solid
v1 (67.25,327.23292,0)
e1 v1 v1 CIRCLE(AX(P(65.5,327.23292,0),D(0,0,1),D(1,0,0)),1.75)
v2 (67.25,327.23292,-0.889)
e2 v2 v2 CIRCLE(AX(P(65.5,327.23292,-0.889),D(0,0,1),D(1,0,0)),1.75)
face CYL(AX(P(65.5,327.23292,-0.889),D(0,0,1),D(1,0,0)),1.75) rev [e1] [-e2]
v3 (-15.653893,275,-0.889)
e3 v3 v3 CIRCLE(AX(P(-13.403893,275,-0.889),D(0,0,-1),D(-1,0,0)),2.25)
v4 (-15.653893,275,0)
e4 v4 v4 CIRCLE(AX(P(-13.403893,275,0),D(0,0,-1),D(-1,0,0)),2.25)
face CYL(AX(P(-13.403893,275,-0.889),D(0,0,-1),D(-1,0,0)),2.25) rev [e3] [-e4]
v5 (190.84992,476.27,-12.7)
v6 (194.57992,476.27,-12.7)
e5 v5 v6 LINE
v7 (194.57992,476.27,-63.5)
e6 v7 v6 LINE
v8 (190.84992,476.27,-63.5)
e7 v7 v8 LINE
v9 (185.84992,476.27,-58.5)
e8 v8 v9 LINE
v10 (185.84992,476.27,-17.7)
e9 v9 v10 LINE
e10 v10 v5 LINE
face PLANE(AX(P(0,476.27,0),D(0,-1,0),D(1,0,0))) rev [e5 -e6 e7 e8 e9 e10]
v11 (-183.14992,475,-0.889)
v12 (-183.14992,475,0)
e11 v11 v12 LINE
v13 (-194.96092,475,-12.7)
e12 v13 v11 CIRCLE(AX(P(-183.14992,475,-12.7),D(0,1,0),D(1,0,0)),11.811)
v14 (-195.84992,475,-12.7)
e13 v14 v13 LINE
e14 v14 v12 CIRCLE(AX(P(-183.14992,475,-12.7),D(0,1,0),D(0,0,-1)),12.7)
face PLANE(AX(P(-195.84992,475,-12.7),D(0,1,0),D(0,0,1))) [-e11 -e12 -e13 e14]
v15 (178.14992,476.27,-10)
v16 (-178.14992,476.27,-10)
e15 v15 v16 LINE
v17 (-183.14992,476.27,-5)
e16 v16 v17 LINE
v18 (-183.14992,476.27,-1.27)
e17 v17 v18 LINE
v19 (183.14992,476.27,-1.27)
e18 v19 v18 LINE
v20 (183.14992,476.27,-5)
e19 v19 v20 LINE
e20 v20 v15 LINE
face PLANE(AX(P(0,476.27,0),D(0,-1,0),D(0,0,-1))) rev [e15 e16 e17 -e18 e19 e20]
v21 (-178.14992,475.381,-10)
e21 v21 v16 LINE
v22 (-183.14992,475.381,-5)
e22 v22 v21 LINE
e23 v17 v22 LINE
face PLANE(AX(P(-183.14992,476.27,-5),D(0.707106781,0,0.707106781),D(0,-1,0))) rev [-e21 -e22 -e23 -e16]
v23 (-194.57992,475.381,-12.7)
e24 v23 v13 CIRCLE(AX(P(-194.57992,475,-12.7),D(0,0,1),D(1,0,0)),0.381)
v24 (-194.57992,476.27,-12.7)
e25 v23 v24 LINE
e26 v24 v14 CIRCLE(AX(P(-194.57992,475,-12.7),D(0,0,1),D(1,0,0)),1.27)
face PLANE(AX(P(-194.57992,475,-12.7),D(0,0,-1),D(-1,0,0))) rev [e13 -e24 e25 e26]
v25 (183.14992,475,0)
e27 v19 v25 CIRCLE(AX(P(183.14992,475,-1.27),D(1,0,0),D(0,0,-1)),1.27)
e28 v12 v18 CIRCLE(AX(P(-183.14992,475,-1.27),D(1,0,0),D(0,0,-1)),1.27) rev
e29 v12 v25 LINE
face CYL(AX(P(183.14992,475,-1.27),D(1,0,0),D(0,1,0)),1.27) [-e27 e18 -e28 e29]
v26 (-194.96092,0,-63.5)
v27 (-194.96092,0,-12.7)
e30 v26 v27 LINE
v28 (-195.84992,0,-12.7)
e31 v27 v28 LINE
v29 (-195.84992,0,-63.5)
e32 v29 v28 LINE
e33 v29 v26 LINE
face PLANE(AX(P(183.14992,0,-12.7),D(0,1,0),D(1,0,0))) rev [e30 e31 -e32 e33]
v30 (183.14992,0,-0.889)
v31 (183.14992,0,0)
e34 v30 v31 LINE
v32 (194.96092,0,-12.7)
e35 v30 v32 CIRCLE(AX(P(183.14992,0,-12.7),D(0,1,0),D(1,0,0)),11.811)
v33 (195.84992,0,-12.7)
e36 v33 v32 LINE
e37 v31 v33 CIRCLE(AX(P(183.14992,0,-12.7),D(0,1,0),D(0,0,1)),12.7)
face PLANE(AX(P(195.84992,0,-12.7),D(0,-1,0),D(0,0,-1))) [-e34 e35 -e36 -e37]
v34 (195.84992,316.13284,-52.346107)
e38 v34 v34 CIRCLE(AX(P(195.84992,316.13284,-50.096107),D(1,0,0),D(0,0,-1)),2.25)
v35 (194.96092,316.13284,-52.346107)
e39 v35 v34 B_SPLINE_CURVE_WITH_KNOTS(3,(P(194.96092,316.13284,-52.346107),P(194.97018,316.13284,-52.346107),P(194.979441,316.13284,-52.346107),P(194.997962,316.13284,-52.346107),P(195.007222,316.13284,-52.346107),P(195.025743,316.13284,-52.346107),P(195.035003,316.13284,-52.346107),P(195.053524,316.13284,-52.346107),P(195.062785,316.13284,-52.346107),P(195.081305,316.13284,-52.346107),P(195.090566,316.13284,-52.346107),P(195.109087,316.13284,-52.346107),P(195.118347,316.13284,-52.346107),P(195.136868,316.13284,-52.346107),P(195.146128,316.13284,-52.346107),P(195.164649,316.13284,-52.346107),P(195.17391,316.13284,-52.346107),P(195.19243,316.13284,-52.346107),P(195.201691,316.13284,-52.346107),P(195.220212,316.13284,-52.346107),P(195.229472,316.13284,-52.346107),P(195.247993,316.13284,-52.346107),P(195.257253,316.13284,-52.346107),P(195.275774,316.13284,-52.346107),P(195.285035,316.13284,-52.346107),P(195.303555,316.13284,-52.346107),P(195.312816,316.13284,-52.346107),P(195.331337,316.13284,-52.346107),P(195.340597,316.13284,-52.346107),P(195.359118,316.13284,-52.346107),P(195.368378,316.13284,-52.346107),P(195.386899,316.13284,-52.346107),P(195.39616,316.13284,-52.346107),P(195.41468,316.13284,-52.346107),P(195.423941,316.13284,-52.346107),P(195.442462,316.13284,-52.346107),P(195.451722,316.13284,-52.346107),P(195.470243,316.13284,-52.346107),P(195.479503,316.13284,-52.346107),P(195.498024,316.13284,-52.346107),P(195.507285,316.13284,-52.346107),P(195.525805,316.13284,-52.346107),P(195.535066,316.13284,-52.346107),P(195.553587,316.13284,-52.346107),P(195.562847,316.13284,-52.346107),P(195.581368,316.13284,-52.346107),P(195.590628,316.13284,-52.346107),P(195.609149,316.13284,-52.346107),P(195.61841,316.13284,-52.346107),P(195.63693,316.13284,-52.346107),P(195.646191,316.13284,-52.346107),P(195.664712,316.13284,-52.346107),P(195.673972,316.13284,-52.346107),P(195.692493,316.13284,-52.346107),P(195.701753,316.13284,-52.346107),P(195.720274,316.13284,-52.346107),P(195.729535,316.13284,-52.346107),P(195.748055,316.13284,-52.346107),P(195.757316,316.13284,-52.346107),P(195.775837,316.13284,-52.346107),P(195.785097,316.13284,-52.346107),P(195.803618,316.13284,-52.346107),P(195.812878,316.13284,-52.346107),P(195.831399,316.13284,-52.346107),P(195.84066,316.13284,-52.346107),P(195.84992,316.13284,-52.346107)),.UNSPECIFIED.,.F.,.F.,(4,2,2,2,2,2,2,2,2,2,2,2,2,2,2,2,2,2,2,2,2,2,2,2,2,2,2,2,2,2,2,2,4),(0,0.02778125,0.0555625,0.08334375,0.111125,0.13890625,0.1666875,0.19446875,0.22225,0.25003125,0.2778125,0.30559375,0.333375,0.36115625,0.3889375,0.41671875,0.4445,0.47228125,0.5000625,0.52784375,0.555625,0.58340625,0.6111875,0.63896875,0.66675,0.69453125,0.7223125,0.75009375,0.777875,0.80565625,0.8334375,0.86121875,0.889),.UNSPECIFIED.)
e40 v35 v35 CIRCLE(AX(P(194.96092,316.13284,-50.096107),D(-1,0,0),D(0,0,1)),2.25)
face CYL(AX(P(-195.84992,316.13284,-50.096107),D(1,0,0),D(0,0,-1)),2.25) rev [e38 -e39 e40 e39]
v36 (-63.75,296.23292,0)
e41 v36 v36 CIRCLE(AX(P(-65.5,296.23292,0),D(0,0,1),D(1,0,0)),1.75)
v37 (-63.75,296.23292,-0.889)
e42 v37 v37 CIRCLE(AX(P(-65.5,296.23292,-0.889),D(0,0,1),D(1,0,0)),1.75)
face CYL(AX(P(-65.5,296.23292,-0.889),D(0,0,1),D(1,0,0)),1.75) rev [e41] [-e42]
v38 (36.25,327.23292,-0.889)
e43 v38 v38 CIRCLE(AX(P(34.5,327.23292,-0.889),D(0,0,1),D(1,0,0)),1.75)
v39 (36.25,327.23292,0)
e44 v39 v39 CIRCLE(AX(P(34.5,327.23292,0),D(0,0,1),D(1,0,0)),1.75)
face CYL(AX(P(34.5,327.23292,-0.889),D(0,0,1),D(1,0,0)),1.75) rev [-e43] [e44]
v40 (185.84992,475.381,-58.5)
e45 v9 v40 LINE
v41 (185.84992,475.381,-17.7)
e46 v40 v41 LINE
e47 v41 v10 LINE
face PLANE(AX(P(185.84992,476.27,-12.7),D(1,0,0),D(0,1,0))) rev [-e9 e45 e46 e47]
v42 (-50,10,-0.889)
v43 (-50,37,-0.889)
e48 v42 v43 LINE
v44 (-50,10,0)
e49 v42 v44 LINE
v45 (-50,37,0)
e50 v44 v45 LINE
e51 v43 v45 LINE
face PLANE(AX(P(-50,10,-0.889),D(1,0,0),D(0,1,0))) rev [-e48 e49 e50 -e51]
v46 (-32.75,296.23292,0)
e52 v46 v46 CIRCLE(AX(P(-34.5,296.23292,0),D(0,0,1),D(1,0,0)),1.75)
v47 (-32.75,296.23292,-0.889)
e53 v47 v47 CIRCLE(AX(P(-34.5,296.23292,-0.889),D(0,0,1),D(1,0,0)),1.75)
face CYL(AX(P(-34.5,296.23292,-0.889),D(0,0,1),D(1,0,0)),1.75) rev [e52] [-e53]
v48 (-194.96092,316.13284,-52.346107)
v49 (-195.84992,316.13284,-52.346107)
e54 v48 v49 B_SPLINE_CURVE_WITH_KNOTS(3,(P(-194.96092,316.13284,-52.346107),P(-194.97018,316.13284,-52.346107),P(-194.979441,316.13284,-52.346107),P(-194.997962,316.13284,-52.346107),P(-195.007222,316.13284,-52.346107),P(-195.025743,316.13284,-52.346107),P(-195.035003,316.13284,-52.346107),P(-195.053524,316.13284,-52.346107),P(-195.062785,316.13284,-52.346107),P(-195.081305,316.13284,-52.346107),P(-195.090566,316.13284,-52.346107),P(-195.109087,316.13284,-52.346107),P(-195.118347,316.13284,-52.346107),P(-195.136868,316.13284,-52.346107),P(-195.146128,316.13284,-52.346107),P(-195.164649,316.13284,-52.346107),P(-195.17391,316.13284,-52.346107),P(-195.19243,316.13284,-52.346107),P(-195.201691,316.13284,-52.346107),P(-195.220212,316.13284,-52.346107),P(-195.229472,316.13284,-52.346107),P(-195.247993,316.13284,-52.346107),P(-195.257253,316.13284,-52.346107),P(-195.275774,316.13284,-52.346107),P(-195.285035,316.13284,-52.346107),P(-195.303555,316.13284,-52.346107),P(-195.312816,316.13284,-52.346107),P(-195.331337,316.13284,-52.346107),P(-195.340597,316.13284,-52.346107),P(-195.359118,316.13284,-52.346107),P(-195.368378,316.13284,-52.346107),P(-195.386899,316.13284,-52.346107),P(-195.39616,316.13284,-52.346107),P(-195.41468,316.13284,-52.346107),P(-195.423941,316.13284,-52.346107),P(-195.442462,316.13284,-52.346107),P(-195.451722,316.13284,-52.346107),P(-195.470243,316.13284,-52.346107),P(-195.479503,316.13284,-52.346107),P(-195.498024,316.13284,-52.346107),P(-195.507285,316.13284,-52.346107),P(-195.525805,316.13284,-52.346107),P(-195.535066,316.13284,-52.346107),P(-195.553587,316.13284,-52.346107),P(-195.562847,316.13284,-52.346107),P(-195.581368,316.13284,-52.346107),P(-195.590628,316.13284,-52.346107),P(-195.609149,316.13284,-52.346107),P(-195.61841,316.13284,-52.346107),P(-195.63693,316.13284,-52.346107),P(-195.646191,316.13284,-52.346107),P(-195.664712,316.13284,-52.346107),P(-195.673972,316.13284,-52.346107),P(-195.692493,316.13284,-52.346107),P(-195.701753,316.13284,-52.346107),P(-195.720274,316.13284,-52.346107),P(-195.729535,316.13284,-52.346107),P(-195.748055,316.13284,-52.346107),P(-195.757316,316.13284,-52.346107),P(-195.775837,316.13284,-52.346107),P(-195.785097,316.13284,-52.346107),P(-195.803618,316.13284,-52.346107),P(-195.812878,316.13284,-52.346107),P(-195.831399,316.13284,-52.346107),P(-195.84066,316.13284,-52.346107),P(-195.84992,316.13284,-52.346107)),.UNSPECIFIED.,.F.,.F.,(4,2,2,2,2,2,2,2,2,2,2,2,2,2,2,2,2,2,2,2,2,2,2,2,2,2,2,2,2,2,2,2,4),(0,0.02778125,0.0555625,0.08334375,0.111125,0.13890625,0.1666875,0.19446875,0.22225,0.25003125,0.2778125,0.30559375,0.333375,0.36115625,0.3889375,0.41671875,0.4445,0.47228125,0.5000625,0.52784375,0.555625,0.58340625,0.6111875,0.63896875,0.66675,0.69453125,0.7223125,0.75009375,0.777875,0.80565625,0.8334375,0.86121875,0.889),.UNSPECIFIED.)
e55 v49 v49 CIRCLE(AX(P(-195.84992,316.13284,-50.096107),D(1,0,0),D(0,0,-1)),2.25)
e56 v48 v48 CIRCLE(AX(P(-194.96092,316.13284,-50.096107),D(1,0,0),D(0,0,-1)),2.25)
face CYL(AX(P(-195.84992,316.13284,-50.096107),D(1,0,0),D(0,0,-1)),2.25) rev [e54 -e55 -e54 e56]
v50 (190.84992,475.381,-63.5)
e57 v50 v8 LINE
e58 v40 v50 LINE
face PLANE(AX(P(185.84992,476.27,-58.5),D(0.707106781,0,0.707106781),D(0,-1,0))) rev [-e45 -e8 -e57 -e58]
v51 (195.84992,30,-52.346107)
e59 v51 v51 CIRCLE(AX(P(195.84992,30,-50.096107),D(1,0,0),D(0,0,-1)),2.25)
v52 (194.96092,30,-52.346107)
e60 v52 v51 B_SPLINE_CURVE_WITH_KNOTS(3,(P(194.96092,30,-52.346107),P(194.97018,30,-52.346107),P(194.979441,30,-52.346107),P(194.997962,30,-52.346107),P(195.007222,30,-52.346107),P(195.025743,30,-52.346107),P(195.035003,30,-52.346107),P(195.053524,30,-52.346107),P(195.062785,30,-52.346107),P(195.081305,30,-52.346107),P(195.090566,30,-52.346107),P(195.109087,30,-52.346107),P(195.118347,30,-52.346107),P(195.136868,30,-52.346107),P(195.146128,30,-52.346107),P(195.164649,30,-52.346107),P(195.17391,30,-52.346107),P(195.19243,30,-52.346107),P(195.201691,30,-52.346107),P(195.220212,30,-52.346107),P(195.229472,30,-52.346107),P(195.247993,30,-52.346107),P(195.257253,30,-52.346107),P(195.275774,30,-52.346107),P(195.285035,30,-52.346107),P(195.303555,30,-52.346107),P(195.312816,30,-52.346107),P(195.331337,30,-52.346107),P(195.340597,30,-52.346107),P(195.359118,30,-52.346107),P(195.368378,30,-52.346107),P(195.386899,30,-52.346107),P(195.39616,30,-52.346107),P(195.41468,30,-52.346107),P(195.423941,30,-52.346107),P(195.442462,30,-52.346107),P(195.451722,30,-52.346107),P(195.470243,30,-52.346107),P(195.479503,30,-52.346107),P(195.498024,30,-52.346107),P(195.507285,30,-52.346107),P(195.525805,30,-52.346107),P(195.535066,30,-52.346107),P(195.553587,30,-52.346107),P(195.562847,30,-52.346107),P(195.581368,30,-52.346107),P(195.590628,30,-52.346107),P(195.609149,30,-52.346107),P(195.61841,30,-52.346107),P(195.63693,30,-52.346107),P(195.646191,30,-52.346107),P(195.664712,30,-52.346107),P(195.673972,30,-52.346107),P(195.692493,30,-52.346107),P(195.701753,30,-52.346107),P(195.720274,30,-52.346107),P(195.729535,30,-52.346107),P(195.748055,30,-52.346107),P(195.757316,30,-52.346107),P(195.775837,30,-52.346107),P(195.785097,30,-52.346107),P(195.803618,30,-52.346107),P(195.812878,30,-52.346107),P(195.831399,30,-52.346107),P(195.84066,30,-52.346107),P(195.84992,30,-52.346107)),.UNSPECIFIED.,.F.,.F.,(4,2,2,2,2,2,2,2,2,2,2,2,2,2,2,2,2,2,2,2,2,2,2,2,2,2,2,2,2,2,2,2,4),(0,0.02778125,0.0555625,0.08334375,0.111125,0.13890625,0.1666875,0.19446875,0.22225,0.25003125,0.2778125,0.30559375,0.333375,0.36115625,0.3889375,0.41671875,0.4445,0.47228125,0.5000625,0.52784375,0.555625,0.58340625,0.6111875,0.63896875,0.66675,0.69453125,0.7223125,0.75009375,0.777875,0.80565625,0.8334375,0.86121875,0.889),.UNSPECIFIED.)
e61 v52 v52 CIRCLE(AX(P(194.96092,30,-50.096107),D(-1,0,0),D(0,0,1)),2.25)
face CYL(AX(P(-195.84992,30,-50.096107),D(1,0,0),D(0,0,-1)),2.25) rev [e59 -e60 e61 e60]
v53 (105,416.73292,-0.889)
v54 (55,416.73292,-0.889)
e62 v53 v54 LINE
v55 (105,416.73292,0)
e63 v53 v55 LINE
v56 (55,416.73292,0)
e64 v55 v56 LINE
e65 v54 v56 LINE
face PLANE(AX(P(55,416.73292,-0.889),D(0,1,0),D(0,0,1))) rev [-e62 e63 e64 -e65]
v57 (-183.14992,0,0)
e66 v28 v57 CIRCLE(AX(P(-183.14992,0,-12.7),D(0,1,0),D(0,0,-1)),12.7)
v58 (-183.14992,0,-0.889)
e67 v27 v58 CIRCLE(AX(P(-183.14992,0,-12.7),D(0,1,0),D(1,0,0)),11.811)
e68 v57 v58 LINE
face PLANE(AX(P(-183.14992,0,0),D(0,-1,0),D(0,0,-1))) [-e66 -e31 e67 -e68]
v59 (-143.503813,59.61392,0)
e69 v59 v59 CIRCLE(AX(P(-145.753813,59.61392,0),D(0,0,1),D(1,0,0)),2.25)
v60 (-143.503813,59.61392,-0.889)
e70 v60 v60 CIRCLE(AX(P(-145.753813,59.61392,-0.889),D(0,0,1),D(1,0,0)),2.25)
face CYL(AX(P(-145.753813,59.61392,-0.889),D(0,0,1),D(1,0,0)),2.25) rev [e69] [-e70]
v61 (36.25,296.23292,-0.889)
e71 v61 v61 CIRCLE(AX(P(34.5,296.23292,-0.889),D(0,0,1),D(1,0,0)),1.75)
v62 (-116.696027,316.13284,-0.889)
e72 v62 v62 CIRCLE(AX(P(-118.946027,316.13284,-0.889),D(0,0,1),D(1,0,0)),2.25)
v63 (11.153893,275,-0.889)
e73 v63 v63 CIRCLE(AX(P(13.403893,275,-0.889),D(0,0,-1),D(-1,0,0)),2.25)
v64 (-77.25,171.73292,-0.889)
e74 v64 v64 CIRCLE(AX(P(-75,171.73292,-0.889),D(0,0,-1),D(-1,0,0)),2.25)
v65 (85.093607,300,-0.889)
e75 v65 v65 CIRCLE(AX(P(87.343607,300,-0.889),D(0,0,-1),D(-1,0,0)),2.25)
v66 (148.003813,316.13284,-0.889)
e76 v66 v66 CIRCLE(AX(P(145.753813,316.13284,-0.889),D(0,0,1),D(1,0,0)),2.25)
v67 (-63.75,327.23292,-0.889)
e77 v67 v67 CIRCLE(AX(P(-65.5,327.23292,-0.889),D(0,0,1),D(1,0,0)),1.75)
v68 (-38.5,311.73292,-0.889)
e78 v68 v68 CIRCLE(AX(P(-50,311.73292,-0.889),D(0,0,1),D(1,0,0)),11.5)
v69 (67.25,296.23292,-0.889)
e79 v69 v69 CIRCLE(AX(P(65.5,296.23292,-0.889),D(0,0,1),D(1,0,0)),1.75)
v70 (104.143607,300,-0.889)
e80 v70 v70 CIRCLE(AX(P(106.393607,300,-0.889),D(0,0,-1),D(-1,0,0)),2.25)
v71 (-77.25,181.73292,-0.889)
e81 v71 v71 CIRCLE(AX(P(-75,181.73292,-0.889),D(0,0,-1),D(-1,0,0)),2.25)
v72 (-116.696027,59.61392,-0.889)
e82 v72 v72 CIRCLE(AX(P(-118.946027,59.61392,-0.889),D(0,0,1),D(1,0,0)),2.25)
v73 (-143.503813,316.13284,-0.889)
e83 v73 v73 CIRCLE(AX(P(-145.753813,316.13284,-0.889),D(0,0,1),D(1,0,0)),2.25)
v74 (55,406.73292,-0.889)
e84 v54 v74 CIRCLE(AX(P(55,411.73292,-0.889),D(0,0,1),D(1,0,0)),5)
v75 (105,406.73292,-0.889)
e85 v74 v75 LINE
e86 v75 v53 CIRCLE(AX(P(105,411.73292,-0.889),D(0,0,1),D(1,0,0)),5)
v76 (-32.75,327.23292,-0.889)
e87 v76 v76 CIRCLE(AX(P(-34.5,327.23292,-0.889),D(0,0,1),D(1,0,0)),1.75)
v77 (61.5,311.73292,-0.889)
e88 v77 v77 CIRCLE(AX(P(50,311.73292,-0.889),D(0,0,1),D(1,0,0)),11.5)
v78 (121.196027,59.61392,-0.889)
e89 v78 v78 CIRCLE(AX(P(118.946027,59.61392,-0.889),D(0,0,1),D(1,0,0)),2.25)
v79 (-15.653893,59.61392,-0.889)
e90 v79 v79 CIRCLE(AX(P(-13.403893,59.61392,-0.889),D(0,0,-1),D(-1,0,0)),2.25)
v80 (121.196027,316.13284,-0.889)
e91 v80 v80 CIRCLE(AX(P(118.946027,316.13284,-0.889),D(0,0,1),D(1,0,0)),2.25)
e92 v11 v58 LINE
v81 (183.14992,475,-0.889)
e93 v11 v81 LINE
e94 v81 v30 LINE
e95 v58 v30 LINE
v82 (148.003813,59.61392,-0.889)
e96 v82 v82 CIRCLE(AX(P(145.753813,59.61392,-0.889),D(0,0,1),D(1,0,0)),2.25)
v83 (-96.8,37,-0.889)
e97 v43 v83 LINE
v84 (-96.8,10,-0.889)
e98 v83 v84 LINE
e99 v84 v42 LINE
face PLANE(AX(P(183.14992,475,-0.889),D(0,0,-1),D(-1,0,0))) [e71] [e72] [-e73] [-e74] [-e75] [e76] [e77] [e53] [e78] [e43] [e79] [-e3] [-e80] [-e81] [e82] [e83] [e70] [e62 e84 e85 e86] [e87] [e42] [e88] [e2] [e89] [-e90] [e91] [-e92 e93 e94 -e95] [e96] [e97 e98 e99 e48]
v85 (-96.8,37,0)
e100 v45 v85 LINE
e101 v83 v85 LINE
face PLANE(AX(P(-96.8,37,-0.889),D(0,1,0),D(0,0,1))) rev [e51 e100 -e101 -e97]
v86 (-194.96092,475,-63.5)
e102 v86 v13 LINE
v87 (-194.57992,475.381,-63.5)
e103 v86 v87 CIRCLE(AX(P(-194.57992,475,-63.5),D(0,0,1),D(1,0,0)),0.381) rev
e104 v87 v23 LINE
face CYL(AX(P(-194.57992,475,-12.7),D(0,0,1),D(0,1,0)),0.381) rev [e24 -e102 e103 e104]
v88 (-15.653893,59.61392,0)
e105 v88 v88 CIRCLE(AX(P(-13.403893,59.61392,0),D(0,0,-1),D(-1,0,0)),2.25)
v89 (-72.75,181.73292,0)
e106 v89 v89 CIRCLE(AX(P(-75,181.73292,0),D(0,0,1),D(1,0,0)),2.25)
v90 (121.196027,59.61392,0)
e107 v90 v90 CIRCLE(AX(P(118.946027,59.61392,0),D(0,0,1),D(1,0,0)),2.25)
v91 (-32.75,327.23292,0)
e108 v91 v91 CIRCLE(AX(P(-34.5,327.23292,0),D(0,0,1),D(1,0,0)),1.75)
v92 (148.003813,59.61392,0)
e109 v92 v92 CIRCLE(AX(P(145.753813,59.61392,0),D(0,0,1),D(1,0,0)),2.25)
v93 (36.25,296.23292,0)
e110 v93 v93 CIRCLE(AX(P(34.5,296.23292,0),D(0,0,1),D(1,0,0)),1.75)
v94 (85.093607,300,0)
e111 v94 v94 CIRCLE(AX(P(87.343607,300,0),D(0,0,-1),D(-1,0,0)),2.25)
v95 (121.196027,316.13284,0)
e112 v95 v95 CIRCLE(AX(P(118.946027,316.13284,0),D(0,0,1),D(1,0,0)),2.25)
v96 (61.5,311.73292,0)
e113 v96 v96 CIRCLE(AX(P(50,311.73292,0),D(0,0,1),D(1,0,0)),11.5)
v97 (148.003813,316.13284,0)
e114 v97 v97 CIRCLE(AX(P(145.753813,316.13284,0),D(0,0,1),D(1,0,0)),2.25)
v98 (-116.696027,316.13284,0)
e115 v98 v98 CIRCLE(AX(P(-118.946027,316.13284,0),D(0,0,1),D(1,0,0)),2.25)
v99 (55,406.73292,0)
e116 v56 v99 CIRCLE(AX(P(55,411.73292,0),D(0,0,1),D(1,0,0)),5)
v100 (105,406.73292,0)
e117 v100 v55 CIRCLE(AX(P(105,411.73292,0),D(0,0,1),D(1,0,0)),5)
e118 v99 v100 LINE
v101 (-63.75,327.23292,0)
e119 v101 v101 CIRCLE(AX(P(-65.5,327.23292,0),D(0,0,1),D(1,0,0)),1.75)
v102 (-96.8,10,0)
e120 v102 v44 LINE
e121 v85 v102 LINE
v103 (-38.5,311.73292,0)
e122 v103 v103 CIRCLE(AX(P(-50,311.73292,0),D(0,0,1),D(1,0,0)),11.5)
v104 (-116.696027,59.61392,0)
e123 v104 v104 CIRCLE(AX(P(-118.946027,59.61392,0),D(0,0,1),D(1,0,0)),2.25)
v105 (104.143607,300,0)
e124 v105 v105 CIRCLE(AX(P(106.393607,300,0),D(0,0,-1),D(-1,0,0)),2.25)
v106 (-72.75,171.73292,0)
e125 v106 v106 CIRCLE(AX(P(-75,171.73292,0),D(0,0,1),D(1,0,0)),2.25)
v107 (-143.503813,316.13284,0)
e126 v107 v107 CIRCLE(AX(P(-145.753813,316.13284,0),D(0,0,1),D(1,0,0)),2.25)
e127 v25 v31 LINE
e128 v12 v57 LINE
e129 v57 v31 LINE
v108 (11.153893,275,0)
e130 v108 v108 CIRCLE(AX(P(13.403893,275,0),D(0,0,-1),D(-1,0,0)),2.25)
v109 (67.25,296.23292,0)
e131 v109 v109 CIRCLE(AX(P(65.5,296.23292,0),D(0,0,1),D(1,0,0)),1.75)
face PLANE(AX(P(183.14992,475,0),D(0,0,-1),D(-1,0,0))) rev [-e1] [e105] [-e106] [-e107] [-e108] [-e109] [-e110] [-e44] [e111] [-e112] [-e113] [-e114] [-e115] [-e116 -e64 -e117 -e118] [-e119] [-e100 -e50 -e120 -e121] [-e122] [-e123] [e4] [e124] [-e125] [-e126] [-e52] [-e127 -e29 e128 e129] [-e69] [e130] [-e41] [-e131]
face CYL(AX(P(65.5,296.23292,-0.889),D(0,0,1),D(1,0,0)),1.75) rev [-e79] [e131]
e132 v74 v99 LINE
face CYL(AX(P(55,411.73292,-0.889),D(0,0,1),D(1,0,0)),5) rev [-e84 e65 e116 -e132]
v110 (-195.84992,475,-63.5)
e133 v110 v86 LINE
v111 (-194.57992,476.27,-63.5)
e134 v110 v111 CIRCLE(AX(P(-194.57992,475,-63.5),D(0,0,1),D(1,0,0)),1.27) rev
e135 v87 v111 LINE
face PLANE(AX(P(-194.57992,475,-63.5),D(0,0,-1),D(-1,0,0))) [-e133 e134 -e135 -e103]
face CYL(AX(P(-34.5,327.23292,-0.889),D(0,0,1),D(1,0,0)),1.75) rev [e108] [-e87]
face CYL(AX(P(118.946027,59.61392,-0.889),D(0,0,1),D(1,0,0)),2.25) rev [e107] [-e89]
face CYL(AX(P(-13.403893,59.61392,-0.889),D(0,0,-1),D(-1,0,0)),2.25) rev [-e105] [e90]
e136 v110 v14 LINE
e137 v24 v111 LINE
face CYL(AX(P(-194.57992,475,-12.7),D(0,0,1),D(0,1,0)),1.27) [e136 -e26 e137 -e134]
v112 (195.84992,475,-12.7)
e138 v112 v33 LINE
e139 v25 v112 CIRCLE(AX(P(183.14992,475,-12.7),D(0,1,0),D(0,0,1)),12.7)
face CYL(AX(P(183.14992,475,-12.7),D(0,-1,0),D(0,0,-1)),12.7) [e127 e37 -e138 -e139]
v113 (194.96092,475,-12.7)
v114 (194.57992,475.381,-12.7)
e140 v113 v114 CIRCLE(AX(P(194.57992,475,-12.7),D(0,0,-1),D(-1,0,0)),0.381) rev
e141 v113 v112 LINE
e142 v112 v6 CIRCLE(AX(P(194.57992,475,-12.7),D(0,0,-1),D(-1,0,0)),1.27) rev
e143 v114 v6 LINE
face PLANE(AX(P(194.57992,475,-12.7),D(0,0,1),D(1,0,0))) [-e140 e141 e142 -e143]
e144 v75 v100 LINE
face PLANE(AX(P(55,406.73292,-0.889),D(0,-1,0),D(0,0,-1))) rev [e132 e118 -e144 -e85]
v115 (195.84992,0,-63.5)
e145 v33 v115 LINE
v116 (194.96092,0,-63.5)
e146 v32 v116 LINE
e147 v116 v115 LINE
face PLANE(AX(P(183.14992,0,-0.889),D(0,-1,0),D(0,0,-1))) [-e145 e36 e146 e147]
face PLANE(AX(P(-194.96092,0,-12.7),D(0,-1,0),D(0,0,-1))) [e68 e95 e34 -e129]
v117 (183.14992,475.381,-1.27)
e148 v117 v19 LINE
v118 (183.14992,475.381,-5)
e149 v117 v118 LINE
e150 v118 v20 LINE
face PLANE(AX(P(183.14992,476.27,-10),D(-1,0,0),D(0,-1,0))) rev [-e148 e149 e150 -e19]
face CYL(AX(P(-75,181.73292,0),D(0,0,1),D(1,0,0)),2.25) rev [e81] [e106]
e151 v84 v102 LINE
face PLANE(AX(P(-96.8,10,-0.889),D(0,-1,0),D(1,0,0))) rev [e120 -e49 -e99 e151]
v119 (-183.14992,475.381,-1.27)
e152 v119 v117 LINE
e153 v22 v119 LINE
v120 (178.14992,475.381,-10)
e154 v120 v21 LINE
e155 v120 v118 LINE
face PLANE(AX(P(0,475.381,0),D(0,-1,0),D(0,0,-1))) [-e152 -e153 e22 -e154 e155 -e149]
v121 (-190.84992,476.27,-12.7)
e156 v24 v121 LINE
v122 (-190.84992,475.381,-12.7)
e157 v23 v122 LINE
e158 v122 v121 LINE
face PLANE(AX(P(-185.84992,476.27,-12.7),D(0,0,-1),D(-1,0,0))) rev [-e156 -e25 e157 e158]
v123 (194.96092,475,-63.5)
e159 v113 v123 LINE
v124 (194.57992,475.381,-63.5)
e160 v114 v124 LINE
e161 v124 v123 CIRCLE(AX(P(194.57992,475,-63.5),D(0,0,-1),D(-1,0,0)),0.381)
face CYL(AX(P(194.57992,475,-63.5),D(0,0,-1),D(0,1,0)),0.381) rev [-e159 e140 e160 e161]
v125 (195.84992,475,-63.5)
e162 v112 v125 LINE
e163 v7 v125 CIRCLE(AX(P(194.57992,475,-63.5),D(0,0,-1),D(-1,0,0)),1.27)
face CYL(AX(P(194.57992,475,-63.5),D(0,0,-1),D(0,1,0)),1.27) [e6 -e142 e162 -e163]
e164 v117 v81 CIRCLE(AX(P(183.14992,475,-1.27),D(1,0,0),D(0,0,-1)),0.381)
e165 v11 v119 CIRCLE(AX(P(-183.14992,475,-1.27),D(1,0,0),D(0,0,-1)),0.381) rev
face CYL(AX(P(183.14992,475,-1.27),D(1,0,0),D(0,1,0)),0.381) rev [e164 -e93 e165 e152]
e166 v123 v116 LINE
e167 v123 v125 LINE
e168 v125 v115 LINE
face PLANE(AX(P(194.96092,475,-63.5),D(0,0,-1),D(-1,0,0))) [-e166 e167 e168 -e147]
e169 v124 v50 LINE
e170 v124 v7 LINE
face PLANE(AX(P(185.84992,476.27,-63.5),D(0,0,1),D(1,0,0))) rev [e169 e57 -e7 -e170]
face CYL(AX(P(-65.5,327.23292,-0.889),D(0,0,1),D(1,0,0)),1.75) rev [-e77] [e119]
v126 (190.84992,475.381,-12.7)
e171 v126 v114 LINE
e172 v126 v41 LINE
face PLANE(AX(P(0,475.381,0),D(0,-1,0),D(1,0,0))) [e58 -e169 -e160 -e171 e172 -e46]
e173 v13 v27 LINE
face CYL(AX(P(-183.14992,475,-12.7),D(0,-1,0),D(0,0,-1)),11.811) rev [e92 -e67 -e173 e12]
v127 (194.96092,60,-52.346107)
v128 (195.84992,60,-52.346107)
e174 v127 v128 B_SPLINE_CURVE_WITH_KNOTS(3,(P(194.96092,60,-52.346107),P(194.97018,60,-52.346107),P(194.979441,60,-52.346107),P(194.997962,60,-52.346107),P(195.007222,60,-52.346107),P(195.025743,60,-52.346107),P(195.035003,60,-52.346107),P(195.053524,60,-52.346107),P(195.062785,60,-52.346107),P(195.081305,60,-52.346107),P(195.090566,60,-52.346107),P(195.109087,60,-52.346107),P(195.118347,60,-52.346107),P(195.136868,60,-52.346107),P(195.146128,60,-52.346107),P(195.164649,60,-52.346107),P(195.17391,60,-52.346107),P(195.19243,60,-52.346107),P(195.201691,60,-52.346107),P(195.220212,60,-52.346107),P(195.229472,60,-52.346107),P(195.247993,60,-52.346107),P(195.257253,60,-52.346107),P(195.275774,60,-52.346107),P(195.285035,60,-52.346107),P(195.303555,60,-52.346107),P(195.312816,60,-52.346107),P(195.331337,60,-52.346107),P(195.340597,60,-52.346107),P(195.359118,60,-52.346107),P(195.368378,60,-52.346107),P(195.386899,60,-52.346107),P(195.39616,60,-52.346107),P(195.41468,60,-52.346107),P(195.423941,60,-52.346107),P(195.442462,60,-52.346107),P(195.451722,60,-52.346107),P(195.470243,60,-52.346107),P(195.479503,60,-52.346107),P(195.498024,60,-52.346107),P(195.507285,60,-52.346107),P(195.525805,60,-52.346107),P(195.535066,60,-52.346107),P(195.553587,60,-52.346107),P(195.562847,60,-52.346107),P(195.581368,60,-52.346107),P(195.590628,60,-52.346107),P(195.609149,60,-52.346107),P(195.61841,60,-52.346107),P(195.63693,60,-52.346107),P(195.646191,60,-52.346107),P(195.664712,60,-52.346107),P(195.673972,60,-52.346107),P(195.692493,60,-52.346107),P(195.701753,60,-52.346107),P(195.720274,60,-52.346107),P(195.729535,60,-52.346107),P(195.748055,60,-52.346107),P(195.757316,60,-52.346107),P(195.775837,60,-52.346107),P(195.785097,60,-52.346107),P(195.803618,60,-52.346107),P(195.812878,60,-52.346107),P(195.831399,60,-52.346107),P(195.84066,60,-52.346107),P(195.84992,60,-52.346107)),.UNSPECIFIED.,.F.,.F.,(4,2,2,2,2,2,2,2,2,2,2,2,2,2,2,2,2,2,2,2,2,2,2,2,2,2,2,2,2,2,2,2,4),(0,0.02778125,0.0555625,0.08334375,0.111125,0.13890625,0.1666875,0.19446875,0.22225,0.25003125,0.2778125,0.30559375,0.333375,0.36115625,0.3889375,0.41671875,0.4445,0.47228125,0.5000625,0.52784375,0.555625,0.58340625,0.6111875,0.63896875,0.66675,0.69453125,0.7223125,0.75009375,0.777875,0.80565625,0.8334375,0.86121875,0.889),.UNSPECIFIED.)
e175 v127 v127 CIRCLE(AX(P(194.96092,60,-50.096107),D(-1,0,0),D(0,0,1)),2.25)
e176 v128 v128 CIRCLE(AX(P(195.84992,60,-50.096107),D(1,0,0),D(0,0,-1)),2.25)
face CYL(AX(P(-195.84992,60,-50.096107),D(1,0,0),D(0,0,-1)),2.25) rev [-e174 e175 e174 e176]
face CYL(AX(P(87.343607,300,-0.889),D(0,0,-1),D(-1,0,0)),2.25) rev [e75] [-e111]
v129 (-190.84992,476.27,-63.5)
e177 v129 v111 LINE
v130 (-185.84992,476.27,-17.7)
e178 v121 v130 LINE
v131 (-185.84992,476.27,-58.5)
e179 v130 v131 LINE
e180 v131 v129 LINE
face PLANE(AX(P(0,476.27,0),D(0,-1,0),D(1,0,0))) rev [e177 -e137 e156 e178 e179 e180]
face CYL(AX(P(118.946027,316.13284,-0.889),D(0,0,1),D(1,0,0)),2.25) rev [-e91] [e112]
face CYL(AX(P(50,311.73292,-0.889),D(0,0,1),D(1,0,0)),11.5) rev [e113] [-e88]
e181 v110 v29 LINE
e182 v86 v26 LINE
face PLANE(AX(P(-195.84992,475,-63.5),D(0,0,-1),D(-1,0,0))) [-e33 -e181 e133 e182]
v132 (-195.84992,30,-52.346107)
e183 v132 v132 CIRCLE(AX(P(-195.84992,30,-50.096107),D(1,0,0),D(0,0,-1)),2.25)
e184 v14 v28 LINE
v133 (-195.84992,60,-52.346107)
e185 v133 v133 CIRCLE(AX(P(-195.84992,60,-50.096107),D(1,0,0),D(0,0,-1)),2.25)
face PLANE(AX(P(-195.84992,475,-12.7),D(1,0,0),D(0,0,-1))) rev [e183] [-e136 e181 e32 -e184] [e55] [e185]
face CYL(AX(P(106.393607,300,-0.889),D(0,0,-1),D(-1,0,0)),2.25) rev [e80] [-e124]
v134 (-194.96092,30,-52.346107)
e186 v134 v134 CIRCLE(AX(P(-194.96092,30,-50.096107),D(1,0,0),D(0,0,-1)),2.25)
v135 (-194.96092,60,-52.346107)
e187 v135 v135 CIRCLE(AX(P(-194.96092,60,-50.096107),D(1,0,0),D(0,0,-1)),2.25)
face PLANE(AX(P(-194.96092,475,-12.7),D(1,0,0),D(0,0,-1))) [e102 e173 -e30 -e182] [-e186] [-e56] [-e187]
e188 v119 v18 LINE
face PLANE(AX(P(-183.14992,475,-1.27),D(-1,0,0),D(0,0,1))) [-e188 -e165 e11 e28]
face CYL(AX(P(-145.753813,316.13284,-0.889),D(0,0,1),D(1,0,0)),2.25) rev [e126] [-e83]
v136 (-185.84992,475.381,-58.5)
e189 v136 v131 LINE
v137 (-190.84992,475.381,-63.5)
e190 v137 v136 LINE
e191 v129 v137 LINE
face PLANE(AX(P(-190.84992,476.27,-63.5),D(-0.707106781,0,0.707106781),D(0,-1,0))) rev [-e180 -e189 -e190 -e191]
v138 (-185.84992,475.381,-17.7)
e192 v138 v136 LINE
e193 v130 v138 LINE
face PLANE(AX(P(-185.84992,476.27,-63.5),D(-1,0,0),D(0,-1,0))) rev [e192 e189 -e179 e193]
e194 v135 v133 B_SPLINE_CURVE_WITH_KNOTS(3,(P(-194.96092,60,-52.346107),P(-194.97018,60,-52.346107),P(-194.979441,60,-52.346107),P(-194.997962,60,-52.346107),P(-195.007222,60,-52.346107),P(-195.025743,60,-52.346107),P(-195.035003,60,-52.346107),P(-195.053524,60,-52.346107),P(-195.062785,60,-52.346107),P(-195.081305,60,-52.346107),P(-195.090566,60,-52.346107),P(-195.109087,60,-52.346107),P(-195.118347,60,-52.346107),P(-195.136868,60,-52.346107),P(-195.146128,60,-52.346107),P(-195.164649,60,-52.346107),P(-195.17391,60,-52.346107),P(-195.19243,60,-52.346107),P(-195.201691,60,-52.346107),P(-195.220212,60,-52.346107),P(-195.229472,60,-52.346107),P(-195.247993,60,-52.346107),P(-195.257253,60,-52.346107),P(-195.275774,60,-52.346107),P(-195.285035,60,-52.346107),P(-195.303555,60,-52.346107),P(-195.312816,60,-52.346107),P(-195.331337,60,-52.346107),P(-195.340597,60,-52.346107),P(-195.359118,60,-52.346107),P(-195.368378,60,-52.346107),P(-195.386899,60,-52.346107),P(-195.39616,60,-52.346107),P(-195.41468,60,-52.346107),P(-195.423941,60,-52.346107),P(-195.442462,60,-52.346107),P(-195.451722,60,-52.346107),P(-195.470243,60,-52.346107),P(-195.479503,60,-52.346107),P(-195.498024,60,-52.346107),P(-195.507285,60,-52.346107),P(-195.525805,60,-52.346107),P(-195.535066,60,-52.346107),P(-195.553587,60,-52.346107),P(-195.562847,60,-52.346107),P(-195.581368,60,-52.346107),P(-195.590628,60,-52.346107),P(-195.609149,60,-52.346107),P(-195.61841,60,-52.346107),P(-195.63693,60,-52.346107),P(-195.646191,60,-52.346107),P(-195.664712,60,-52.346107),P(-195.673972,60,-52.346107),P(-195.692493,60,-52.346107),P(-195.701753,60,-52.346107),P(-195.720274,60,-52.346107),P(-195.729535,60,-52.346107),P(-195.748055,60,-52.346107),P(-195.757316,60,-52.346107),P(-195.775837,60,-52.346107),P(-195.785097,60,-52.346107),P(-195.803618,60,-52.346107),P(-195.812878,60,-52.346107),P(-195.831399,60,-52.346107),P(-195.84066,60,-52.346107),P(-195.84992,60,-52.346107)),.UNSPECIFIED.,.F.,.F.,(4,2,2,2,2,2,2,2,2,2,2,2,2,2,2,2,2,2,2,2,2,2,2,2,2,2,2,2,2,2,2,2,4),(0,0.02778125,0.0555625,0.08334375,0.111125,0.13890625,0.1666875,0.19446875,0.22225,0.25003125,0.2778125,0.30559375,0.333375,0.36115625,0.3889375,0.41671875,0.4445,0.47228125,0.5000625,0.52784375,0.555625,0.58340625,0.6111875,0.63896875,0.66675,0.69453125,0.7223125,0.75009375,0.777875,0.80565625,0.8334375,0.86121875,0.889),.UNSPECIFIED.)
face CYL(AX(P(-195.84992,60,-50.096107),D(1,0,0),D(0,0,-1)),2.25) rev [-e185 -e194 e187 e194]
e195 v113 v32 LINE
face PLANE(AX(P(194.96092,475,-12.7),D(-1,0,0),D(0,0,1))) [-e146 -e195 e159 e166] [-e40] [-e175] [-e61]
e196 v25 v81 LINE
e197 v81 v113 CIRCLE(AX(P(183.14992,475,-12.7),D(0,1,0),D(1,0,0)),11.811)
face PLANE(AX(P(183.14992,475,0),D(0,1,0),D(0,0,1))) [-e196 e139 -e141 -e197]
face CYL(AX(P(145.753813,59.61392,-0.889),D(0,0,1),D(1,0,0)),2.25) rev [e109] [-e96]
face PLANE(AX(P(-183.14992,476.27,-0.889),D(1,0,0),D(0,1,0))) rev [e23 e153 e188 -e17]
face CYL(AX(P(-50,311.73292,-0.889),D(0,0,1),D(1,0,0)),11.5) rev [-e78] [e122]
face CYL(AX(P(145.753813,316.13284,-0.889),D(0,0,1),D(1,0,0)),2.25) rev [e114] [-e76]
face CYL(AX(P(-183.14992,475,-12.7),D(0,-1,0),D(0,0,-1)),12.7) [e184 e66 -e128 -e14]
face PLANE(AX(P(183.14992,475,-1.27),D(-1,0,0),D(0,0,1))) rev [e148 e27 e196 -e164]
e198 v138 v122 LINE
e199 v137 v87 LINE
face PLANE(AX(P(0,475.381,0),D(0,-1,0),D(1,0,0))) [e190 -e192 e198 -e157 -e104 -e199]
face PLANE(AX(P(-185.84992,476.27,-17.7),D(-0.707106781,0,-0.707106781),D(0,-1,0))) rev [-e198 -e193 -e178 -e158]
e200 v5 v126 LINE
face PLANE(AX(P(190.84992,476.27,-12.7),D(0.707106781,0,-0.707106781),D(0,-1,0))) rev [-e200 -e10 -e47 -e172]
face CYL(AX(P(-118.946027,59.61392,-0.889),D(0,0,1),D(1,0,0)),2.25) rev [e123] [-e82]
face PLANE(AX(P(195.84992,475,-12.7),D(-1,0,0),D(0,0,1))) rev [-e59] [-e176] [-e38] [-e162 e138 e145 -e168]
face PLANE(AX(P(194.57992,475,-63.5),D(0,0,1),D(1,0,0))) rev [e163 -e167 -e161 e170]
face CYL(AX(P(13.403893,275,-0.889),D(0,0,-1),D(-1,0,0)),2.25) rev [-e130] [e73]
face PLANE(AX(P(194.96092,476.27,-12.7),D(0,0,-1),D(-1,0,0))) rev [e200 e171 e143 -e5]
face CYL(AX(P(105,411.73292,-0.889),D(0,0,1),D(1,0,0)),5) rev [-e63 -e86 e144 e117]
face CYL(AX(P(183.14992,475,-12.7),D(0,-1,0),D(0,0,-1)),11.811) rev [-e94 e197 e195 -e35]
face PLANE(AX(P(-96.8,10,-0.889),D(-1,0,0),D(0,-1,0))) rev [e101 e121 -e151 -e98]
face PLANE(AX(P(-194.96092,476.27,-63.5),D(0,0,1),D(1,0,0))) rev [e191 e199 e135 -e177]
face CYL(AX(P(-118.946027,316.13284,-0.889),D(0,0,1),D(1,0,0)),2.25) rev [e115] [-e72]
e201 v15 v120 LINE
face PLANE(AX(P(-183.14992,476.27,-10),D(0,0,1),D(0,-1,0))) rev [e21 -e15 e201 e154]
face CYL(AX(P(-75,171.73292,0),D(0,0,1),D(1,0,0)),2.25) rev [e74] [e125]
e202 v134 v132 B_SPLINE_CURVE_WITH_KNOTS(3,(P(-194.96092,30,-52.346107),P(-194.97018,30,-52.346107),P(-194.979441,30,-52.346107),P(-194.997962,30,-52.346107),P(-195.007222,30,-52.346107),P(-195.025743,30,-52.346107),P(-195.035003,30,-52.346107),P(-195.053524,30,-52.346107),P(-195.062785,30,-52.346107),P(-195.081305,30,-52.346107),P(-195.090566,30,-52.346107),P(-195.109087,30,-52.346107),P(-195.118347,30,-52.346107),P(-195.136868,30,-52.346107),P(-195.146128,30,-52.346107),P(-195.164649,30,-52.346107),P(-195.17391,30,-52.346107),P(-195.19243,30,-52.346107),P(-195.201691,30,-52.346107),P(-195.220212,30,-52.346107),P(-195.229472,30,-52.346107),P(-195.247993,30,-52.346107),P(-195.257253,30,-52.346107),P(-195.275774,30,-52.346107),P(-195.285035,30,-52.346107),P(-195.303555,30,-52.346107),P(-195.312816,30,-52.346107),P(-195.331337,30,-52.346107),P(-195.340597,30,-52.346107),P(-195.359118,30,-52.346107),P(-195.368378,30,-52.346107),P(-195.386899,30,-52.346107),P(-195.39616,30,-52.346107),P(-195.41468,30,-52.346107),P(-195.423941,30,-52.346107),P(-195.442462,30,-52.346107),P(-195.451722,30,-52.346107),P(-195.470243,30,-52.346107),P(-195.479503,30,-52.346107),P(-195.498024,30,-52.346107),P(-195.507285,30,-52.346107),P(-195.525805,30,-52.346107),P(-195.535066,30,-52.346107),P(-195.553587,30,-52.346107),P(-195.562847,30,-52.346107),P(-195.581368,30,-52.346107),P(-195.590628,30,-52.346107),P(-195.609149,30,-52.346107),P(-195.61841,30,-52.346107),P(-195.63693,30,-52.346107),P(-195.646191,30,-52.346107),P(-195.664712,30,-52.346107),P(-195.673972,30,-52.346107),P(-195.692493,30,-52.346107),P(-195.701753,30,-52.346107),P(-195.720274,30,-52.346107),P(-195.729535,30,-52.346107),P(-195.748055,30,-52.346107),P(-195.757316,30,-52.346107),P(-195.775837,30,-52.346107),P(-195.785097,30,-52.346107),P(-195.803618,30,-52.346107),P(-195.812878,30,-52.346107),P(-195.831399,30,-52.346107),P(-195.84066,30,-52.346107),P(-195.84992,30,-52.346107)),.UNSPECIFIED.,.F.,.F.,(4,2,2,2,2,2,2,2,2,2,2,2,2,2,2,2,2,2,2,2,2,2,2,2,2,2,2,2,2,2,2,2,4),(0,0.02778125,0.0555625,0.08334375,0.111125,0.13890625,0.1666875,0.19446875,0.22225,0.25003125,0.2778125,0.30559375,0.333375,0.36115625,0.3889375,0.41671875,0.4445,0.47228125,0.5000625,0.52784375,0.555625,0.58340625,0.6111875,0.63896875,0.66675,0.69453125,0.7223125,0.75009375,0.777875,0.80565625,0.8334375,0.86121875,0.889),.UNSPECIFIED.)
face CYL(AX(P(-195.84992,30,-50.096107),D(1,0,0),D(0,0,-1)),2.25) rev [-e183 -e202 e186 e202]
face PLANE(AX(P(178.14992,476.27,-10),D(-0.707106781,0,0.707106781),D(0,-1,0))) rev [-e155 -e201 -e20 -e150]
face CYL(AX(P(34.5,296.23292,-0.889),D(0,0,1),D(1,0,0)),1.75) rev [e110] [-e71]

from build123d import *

# Parameters (mm, degrees)
BASE_FLANGE2_DEPTH         = 475
SKETCH13_R                 = 2.25
CUT_EXTRUDE4_DEPTH         = 619.939427235
SKETCH14_R                 = 11.5
SKETCH14_R_2               = 1.75
STEPPER_MOTOR_CUTOUT_DEPTH = 0.889
SKETCH15_R                 = 2.25
CUT_EXTRUDE6_DEPTH         = 0.889
SKETCH16_W                 = 46.8
SKETCH16_H                 = 27
CUT_EXTRUDE7_DEPTH         = 0.889
M4_CLEARANCE_HOLE1_D       = 4.5
EDGE_FLANGE1_DEPTH         = 50.8
EDGE_FLANGE1_BEND_DEPTH    = 366.29983991
EDGE_FLANGE1_BEND_2_DEPTH  = 50.8
BREAK_CORNER1_START        = 475.381
BREAK_CORNER1_DEPTH        = 0.889
CUT_EXTRUDE8_DEPTH         = 10
M4_CLEARANCE_HOLE2_D       = 4.5
M4_CLEARANCE_HOLE3_D       = 4.5


# Read off the part's stored shape, not the designer's step: Break-Corner1
# Sheet-metal steps are written as plain solids
with BuildPart() as part:
    # Sketch1 → Base-Flange2 (new body)
    with BuildSketch(Plane(origin=(0, 0, 0), x_dir=(1, 0, 0), z_dir=(0, 1, 0))):
        with BuildLine():
            Line((195.849919955, 63.5), (195.849919955, 12.7))
            ThreePointArc((195.849919955, 12.7), (192.130176076, 3.719743879), (183.149919955, 0))
            Line((183.149919955, 0), (-183.149919955, 0))
            ThreePointArc((-183.149919955, 0), (-192.130176076, 3.719743879), (-195.849919955, 12.7))
            Line((-195.849919955, 12.7), (-195.849919955, 63.5))
            Line((-195.849919955, 63.5), (-194.960919955, 63.5))
            Line((-194.960919955, 63.5), (-194.960919955, 12.7))
            ThreePointArc((-194.960919955, 12.7), (-191.501558148, 4.348361807), (-183.149919955, 0.889))
            Line((-183.149919955, 0.889), (183.149919955, 0.889))
            ThreePointArc((183.149919955, 0.889), (191.501558148, 4.348361807), (194.960919955, 12.7))
            Line((194.960919955, 12.7), (194.960919955, 63.5))
            Line((194.960919955, 63.5), (195.849919955, 63.5))
        make_face()
    extrude(amount=BASE_FLANGE2_DEPTH)

    # Sketch13 → Cut-Extrude4 (cut, through all)
    with BuildSketch(Plane(origin=(195.849919955, 0, 0), x_dir=(0, 0, -1), z_dir=(1, 0, 0))):
        with Locations((50.096107, 60)):
            Circle(SKETCH13_R)
        with Locations((50.096107, 316.132840032)):
            Circle(SKETCH13_R)
        with Locations((50.096107, 30)):
            Circle(SKETCH13_R)
    extrude(amount=-CUT_EXTRUDE4_DEPTH, mode=Mode.SUBTRACT)

    # Sketch14 → Stepper motor cutout (cut)
    with BuildSketch(Plane.XY):
        with Locations((50, 311.73292)):
            Circle(SKETCH14_R)
        with Locations((34.5, 296.23292)):
            Circle(SKETCH14_R_2)
        with Locations((65.5, 296.23292)):
            Circle(SKETCH14_R_2)
        with Locations((34.5, 327.23292)):
            Circle(SKETCH14_R_2)
        with Locations((65.5, 327.23292)):
            Circle(SKETCH14_R_2)
        with Locations((-50, 311.73292)):
            Circle(SKETCH14_R)
        with Locations((-65.5, 296.23292)):
            Circle(SKETCH14_R_2)
        with Locations((-34.5, 296.23292)):
            Circle(SKETCH14_R_2)
        with Locations((-65.5, 327.23292)):
            Circle(SKETCH14_R_2)
        with Locations((-34.5, 327.23292)):
            Circle(SKETCH14_R_2)
    extrude(amount=-STEPPER_MOTOR_CUTOUT_DEPTH, mode=Mode.SUBTRACT)

    # Sketch15 → Cut-Extrude6 (cut)
    with BuildSketch(Plane.XY):
        with Locations((-145.753812955, 316.132839976)):
            Circle(SKETCH15_R)
        with Locations((-118.946026845, 316.132839976)):
            Circle(SKETCH15_R)
        with Locations((118.946026845, 316.132839976)):
            Circle(SKETCH15_R)
        with Locations((145.753812955, 316.132839976)):
            Circle(SKETCH15_R)
        with Locations((145.753812955, 59.61392)):
            Circle(SKETCH15_R)
        with Locations((118.946026845, 59.61392)):
            Circle(SKETCH15_R)
        with Locations((-118.946026845, 59.61392)):
            Circle(SKETCH15_R)
        with Locations((-145.753812955, 59.61392)):
            Circle(SKETCH15_R)
    extrude(amount=-CUT_EXTRUDE6_DEPTH, mode=Mode.SUBTRACT)

    # Sketch16 → Cut-Extrude7 (cut)
    with BuildSketch(Plane.XY):
        with Locations((-73.4, 23.5)):
            Rectangle(SKETCH16_W, SKETCH16_H)
    extrude(amount=-CUT_EXTRUDE7_DEPTH, mode=Mode.SUBTRACT)

    # M4 Clearance Hole1 (through all)
    with Locations(Plane.XY):
        with Locations((-75, 181.73292), (-75, 171.73292)):
            Hole(M4_CLEARANCE_HOLE1_D / 2)

    # Edge-Flange1 section (across the edge) → Edge-Flange1 (add)
    with BuildSketch(Plane(origin=(-194.960919955, 475.381, -63.5), x_dir=(0, -1, 0), z_dir=(0, 0, 1))):
        with BuildLine():
            Line((-0.889, 0.381), (-0.889, 9.111))
            Line((-0.889, 9.111), (0, 9.111))
            Line((0, 9.111), (0, 0.381))
            ThreePointArc((0, 0.381), (0.111592316, 0.111592316), (0.381, 0))
            Line((0.381, 0), (0.381, -0.889))
            ThreePointArc((0.381, -0.889), (-0.517025612, -0.517025612), (-0.889, 0.381))
        make_face()
    extrude(amount=EDGE_FLANGE1_DEPTH)

    # Edge-Flange1 section 2 (across the edge) → Edge-Flange1 bend (add)
    with BuildSketch(Plane(origin=(-183.149919955, 475.381, -0.889), x_dir=(0, -1, 0), z_dir=(1, 0, 0))):
        with BuildLine():
            Line((-0.889, 0.381), (-0.889, 9.111))
            Line((-0.889, 9.111), (0, 9.111))
            Line((0, 9.111), (0, 0.381))
            ThreePointArc((0, 0.381), (0.111592316, 0.111592316), (0.381, 0))
            Line((0.381, 0), (0.381, -0.889))
            ThreePointArc((0.381, -0.889), (-0.517025612, -0.517025612), (-0.889, 0.381))
        make_face()
    extrude(amount=EDGE_FLANGE1_BEND_DEPTH)

    # Edge-Flange1 section 3 (across the edge) → Edge-Flange1 bend 2 (add)
    with BuildSketch(Plane(origin=(194.960919955, 475.381, -12.7), x_dir=(0, -1, 0), z_dir=(0, 0, -1))):
        with BuildLine():
            Line((-0.889, 0.381), (-0.889, 9.111))
            Line((-0.889, 9.111), (0, 9.111))
            Line((0, 9.111), (0, 0.381))
            ThreePointArc((0, 0.381), (0.111592316, 0.111592316), (0.381, 0))
            Line((0.381, 0), (0.381, -0.889))
            ThreePointArc((0.381, -0.889), (-0.517025612, -0.517025612), (-0.889, 0.381))
        make_face()
    extrude(amount=EDGE_FLANGE1_BEND_2_DEPTH)

    # Break-Corner1 outline → Break-Corner1 (cut)
    with BuildSketch(Plane(origin=(0, 0, 0), x_dir=(1, 0, 0), z_dir=(0, 1, 0)).offset(BREAK_CORNER1_START)):
        Polygon((183.149919955, 10), (178.149919955, 10), (183.149919955, 5), align=None)
        Polygon((-183.149919955, 5), (-178.149919955, 10), (-183.149919955, 10), align=None)
        Polygon((185.849919955, 63.5), (185.849919955, 58.5), (190.849919955, 63.5), align=None)
        Polygon((190.849919955, 12.7), (185.849919955, 17.7), (185.849919955, 12.7), align=None)
        Polygon((-185.849919955, 63.5), (-190.849919955, 63.5), (-185.849919955, 58.5), align=None)
        Polygon((-185.849919955, 12.7), (-185.849919955, 17.7), (-190.849919955, 12.7), align=None)
    extrude(amount=BREAK_CORNER1_DEPTH, mode=Mode.SUBTRACT)

    # Sketch29 → Cut-Extrude8 (cut)
    with BuildSketch(Plane.XY):
        with BuildLine():
            Line((55, 416.73292), (105, 416.73292))
            ThreePointArc((105, 416.73292), (110, 411.73292), (105, 406.73292))
            Line((105, 406.73292), (55, 406.73292))
            ThreePointArc((55, 406.73292), (50, 411.73292), (55, 416.73292))
        make_face()
    extrude(amount=-CUT_EXTRUDE8_DEPTH, mode=Mode.SUBTRACT)

    # M4 Clearance Hole2 (through all)
    with Locations(Plane(origin=(0, 0, -0.889), x_dir=(-1, 0, 0), z_dir=(0, 0, -1))):
        with Locations((-13.403893, 275), (13.403893, 275), (13.403893, 59.61392)):
            Hole(M4_CLEARANCE_HOLE2_D / 2)

    # M4 Clearance Hole3 (through all)
    with Locations(Plane(origin=(0, 0, -0.889), x_dir=(-1, 0, 0), z_dir=(0, 0, -1))):
        with Locations((-106.393607124, 300), (-87.343607124, 300)):
            Hole(M4_CLEARANCE_HOLE3_D / 2)


solid = part.part
